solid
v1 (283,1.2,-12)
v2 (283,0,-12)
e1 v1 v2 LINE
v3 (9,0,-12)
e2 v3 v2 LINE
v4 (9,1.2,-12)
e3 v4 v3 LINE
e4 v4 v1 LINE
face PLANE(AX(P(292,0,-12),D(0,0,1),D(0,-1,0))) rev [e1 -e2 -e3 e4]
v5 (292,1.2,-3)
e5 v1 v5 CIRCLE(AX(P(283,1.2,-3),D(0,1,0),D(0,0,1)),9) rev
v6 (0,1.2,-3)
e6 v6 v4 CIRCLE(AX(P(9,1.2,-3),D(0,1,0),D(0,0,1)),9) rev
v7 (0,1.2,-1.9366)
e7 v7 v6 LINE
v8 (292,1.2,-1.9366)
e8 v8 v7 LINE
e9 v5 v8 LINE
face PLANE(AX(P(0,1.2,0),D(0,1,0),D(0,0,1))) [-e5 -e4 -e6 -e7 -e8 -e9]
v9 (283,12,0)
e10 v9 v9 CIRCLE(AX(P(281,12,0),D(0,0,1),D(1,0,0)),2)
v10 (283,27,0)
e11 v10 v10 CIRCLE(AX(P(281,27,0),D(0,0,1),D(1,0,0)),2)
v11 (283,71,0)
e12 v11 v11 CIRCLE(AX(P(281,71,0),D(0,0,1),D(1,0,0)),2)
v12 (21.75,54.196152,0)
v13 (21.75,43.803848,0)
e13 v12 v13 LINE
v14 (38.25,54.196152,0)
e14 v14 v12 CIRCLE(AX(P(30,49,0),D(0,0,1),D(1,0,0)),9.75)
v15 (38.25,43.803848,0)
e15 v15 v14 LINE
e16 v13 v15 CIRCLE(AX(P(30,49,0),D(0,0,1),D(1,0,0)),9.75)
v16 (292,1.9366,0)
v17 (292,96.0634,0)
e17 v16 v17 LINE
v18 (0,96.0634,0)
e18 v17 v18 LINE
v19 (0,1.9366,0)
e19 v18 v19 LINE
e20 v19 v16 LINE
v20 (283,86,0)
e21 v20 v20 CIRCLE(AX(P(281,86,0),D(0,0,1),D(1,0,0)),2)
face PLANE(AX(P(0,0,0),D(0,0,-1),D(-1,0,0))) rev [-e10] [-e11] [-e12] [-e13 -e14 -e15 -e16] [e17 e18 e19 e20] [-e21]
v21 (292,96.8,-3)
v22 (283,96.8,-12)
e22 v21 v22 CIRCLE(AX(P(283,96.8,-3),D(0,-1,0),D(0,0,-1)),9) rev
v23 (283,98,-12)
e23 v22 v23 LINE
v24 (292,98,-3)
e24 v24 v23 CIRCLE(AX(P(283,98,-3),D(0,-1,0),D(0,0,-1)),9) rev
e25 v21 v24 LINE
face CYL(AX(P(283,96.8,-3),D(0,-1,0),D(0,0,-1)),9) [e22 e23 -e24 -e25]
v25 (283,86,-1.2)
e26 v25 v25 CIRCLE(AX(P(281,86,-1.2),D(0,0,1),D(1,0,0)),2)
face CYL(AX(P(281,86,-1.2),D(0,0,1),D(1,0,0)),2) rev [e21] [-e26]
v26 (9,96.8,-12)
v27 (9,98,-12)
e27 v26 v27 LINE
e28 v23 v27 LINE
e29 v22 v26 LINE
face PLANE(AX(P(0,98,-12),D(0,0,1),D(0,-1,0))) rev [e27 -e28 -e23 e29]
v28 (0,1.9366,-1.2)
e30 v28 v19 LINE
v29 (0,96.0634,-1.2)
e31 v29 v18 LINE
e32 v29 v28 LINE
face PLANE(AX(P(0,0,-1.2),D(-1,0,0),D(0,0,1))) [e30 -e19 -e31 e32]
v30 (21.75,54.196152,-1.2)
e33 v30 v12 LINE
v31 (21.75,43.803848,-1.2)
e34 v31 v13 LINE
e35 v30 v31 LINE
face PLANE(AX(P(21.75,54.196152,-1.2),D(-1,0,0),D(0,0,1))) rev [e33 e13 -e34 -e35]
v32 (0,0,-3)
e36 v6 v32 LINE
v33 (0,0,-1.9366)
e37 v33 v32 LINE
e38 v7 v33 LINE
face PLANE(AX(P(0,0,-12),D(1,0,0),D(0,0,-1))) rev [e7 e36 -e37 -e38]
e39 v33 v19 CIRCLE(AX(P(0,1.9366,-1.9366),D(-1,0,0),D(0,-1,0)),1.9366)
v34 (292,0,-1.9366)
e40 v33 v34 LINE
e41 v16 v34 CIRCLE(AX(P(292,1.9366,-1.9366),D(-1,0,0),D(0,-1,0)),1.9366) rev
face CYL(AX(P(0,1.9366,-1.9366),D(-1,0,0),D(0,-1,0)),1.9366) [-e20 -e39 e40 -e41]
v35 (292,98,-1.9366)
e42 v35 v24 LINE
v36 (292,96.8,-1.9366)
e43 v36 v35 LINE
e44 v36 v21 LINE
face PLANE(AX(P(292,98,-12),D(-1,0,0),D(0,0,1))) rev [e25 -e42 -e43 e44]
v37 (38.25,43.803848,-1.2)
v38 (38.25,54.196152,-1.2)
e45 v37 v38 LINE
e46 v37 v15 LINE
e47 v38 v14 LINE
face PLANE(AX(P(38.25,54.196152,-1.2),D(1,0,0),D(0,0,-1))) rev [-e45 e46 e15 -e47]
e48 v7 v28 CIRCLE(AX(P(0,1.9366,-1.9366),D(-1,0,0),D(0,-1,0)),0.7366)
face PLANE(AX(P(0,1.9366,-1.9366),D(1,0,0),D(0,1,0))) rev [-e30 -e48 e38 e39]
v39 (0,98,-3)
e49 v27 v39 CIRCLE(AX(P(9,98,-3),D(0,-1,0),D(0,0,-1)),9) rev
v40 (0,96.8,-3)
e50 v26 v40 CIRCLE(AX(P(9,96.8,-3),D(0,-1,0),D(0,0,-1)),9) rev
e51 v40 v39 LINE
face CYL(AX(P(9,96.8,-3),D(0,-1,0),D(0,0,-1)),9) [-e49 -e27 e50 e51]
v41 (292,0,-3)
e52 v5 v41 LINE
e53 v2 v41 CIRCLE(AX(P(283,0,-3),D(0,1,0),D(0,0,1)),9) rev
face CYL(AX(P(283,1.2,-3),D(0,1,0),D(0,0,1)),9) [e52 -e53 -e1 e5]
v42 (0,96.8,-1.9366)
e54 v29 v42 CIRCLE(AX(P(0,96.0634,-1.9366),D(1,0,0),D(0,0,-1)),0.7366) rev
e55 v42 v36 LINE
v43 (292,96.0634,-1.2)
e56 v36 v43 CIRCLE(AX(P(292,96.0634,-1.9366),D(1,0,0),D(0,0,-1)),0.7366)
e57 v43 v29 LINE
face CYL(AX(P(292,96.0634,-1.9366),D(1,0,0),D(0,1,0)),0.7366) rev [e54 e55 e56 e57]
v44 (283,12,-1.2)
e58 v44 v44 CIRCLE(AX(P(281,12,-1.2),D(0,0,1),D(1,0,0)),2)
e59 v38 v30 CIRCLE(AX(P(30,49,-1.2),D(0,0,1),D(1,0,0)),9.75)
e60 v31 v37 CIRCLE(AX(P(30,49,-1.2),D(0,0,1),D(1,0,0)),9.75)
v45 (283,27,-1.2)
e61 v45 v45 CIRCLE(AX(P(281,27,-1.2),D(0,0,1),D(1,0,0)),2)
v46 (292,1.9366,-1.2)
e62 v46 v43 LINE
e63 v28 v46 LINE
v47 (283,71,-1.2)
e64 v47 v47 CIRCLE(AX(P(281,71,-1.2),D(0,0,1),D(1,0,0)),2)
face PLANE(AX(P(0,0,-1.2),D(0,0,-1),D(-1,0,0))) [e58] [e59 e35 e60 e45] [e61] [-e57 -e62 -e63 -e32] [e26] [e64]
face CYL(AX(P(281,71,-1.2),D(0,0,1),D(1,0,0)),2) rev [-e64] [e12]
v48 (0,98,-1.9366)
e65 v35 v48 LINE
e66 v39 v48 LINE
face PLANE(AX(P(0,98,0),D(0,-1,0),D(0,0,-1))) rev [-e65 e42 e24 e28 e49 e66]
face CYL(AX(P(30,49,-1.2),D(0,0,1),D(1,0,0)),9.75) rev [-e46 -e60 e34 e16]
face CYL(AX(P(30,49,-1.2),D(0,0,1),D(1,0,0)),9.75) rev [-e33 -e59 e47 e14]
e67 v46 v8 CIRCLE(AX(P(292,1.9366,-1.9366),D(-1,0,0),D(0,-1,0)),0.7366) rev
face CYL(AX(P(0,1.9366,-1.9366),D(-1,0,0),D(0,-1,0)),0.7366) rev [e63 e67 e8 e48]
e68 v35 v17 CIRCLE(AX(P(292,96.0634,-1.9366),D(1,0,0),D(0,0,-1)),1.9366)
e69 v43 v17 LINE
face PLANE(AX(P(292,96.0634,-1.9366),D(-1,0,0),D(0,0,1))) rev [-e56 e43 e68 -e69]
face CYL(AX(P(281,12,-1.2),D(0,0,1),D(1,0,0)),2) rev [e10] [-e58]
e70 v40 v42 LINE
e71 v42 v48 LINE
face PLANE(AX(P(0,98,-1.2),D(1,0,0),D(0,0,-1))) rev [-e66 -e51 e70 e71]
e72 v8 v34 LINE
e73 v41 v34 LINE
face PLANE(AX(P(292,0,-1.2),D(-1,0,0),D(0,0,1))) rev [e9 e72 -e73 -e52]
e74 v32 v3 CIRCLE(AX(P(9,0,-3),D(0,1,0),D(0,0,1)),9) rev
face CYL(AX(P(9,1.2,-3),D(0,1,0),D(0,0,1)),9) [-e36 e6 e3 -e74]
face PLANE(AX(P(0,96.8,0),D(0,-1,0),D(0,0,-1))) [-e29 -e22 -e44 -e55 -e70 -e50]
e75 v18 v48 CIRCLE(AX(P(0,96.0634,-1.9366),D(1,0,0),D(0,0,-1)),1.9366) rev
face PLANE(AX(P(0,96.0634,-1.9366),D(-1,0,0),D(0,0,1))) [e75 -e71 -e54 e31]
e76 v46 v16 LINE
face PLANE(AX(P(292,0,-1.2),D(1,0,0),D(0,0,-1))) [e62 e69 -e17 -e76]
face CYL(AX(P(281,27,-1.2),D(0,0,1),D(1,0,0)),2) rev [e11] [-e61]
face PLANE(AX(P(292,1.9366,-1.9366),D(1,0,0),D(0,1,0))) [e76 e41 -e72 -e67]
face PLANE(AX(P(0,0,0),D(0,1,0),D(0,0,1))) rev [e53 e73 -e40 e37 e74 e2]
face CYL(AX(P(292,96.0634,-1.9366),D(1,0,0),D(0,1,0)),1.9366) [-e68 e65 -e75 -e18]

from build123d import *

# Parameters (mm, degrees)
SKETCH_1_W                         = 292
SKETCH_1_H                         = 98
SKETCH_1_R                         = 2
SM_BASE_FLANGE_1_DEPTH             = 1.2
SM_EDGE_FLANGE_1_STRIP_W           = 6.2732
SM_EDGE_FLANGE_1_STRIP_H           = 1.2
SM_EDGE_FLANGE_1_STRIP_CUT_DEPTH   = 292
SM_EDGE_FLANGE_1_STRIP_2_W         = 6.2732
SM_EDGE_FLANGE_1_STRIP_2_H         = 1.2
SM_EDGE_FLANGE_1_STRIP_CUT_2_DEPTH = 292
SM_EDGE_FLANGE_1_DEPTH             = 292
SM_EDGE_FLANGE_1_BEND_DEPTH        = 292
CUT_EXTRUDE_1_DEPTH                = 309.240166104


# Sheet-metal steps are written as plain solids
with BuildPart() as part:
    # Sketch 1 → Базовая кромка1 (new body)
    with BuildSketch(Plane.XY):
        with Locations((146, 49)):
            Rectangle(SKETCH_1_W, SKETCH_1_H)
        with Locations((281, 86)):
            Circle(SKETCH_1_R, mode=Mode.SUBTRACT)
        with Locations((281, 71)):
            Circle(SKETCH_1_R, mode=Mode.SUBTRACT)
        with Locations((281, 27)):
            Circle(SKETCH_1_R, mode=Mode.SUBTRACT)
        with Locations((281, 12)):
            Circle(SKETCH_1_R, mode=Mode.SUBTRACT)
        with BuildLine():
            Line((21.75, 54.196152423), (21.75, 43.803847577))
            ThreePointArc((21.75, 43.803847577), (30, 39.25), (38.25, 43.803847577))
            Line((38.25, 43.803847577), (38.25, 54.196152423))
            ThreePointArc((38.25, 54.196152423), (30, 58.75), (21.75, 54.196152423))
        make_face(mode=Mode.SUBTRACT)
    extrude(amount=-SM_BASE_FLANGE_1_DEPTH)

    # Ребро-кромка1 strip (across the edge) → Ребро-кромка1 strip cut (cut)
    with BuildSketch(Plane(origin=(0, 98, -1.2), x_dir=(0, -1, 0), z_dir=(1, 0, 0))):
        with Locations((-1.2, -0.6)):
            Rectangle(SM_EDGE_FLANGE_1_STRIP_W, SM_EDGE_FLANGE_1_STRIP_H)
    extrude(amount=SM_EDGE_FLANGE_1_STRIP_CUT_DEPTH, mode=Mode.SUBTRACT)

    # Ребро-кромка1 strip 2 (across the edge) → Ребро-кромка1 strip cut 2 (cut)
    with BuildSketch(Plane(origin=(292, 0, -1.2), x_dir=(0, 1, 0), z_dir=(-1, 0, 0))):
        with Locations((-1.2, -0.6)):
            Rectangle(SM_EDGE_FLANGE_1_STRIP_2_W, SM_EDGE_FLANGE_1_STRIP_2_H)
    extrude(amount=SM_EDGE_FLANGE_1_STRIP_CUT_2_DEPTH, mode=Mode.SUBTRACT)

    # Ребро-кромка1 section (across the edge) → Ребро-кромка1 (add)
    with BuildSketch(Plane(origin=(0, 98, -1.2), x_dir=(0, -1, 0), z_dir=(1, 0, 0))):
        with BuildLine():
            Line((0, 0.7366), (0, 10.8))
            Line((0, 10.8), (1.2, 10.8))
            Line((1.2, 10.8), (1.2, 0.7366))
            ThreePointArc((1.2, 0.7366), (1.415745145, 0.215745145), (1.9366, 0))
            Line((1.9366, 0), (1.9366, -1.2))
            ThreePointArc((1.9366, -1.2), (0.567217008, -0.632782992), (0, 0.7366))
        make_face()
    extrude(amount=SM_EDGE_FLANGE_1_DEPTH)

    # Ребро-кромка1 section 2 (across the edge) → Ребро-кромка1 bend (add)
    with BuildSketch(Plane(origin=(292, 0, -1.2), x_dir=(0, 1, 0), z_dir=(-1, 0, 0))):
        with BuildLine():
            Line((0, 0.7366), (0, 10.8))
            Line((0, 10.8), (1.2, 10.8))
            Line((1.2, 10.8), (1.2, 0.7366))
            ThreePointArc((1.2, 0.7366), (1.415745145, 0.215745145), (1.9366, 0))
            Line((1.9366, 0), (1.9366, -1.2))
            ThreePointArc((1.9366, -1.2), (0.567217008, -0.632782992), (0, 0.7366))
        make_face()
    extrude(amount=SM_EDGE_FLANGE_1_BEND_DEPTH)

    # Эскиз12 → Вырез-Вытянуть1 (cut, through all)
    with BuildSketch(Plane(origin=(0, 98, 0), x_dir=(1, 0, 0), z_dir=(0, 1, 0))):
        with BuildLine():
            Line((9, 12), (0, 12))
            Line((0, 12), (0, 3))
            ThreePointArc((0, 3), (2.636038969, 9.363961031), (9, 12))
        make_face()
        with BuildLine():
            Line((283, 12), (292, 12))
            Line((292, 12), (292, 3))
            ThreePointArc((292, 3), (289.363961031, 9.363961031), (283, 12))
        make_face()
    extrude(amount=-CUT_EXTRUDE_1_DEPTH, mode=Mode.SUBTRACT)


solid = part.part
